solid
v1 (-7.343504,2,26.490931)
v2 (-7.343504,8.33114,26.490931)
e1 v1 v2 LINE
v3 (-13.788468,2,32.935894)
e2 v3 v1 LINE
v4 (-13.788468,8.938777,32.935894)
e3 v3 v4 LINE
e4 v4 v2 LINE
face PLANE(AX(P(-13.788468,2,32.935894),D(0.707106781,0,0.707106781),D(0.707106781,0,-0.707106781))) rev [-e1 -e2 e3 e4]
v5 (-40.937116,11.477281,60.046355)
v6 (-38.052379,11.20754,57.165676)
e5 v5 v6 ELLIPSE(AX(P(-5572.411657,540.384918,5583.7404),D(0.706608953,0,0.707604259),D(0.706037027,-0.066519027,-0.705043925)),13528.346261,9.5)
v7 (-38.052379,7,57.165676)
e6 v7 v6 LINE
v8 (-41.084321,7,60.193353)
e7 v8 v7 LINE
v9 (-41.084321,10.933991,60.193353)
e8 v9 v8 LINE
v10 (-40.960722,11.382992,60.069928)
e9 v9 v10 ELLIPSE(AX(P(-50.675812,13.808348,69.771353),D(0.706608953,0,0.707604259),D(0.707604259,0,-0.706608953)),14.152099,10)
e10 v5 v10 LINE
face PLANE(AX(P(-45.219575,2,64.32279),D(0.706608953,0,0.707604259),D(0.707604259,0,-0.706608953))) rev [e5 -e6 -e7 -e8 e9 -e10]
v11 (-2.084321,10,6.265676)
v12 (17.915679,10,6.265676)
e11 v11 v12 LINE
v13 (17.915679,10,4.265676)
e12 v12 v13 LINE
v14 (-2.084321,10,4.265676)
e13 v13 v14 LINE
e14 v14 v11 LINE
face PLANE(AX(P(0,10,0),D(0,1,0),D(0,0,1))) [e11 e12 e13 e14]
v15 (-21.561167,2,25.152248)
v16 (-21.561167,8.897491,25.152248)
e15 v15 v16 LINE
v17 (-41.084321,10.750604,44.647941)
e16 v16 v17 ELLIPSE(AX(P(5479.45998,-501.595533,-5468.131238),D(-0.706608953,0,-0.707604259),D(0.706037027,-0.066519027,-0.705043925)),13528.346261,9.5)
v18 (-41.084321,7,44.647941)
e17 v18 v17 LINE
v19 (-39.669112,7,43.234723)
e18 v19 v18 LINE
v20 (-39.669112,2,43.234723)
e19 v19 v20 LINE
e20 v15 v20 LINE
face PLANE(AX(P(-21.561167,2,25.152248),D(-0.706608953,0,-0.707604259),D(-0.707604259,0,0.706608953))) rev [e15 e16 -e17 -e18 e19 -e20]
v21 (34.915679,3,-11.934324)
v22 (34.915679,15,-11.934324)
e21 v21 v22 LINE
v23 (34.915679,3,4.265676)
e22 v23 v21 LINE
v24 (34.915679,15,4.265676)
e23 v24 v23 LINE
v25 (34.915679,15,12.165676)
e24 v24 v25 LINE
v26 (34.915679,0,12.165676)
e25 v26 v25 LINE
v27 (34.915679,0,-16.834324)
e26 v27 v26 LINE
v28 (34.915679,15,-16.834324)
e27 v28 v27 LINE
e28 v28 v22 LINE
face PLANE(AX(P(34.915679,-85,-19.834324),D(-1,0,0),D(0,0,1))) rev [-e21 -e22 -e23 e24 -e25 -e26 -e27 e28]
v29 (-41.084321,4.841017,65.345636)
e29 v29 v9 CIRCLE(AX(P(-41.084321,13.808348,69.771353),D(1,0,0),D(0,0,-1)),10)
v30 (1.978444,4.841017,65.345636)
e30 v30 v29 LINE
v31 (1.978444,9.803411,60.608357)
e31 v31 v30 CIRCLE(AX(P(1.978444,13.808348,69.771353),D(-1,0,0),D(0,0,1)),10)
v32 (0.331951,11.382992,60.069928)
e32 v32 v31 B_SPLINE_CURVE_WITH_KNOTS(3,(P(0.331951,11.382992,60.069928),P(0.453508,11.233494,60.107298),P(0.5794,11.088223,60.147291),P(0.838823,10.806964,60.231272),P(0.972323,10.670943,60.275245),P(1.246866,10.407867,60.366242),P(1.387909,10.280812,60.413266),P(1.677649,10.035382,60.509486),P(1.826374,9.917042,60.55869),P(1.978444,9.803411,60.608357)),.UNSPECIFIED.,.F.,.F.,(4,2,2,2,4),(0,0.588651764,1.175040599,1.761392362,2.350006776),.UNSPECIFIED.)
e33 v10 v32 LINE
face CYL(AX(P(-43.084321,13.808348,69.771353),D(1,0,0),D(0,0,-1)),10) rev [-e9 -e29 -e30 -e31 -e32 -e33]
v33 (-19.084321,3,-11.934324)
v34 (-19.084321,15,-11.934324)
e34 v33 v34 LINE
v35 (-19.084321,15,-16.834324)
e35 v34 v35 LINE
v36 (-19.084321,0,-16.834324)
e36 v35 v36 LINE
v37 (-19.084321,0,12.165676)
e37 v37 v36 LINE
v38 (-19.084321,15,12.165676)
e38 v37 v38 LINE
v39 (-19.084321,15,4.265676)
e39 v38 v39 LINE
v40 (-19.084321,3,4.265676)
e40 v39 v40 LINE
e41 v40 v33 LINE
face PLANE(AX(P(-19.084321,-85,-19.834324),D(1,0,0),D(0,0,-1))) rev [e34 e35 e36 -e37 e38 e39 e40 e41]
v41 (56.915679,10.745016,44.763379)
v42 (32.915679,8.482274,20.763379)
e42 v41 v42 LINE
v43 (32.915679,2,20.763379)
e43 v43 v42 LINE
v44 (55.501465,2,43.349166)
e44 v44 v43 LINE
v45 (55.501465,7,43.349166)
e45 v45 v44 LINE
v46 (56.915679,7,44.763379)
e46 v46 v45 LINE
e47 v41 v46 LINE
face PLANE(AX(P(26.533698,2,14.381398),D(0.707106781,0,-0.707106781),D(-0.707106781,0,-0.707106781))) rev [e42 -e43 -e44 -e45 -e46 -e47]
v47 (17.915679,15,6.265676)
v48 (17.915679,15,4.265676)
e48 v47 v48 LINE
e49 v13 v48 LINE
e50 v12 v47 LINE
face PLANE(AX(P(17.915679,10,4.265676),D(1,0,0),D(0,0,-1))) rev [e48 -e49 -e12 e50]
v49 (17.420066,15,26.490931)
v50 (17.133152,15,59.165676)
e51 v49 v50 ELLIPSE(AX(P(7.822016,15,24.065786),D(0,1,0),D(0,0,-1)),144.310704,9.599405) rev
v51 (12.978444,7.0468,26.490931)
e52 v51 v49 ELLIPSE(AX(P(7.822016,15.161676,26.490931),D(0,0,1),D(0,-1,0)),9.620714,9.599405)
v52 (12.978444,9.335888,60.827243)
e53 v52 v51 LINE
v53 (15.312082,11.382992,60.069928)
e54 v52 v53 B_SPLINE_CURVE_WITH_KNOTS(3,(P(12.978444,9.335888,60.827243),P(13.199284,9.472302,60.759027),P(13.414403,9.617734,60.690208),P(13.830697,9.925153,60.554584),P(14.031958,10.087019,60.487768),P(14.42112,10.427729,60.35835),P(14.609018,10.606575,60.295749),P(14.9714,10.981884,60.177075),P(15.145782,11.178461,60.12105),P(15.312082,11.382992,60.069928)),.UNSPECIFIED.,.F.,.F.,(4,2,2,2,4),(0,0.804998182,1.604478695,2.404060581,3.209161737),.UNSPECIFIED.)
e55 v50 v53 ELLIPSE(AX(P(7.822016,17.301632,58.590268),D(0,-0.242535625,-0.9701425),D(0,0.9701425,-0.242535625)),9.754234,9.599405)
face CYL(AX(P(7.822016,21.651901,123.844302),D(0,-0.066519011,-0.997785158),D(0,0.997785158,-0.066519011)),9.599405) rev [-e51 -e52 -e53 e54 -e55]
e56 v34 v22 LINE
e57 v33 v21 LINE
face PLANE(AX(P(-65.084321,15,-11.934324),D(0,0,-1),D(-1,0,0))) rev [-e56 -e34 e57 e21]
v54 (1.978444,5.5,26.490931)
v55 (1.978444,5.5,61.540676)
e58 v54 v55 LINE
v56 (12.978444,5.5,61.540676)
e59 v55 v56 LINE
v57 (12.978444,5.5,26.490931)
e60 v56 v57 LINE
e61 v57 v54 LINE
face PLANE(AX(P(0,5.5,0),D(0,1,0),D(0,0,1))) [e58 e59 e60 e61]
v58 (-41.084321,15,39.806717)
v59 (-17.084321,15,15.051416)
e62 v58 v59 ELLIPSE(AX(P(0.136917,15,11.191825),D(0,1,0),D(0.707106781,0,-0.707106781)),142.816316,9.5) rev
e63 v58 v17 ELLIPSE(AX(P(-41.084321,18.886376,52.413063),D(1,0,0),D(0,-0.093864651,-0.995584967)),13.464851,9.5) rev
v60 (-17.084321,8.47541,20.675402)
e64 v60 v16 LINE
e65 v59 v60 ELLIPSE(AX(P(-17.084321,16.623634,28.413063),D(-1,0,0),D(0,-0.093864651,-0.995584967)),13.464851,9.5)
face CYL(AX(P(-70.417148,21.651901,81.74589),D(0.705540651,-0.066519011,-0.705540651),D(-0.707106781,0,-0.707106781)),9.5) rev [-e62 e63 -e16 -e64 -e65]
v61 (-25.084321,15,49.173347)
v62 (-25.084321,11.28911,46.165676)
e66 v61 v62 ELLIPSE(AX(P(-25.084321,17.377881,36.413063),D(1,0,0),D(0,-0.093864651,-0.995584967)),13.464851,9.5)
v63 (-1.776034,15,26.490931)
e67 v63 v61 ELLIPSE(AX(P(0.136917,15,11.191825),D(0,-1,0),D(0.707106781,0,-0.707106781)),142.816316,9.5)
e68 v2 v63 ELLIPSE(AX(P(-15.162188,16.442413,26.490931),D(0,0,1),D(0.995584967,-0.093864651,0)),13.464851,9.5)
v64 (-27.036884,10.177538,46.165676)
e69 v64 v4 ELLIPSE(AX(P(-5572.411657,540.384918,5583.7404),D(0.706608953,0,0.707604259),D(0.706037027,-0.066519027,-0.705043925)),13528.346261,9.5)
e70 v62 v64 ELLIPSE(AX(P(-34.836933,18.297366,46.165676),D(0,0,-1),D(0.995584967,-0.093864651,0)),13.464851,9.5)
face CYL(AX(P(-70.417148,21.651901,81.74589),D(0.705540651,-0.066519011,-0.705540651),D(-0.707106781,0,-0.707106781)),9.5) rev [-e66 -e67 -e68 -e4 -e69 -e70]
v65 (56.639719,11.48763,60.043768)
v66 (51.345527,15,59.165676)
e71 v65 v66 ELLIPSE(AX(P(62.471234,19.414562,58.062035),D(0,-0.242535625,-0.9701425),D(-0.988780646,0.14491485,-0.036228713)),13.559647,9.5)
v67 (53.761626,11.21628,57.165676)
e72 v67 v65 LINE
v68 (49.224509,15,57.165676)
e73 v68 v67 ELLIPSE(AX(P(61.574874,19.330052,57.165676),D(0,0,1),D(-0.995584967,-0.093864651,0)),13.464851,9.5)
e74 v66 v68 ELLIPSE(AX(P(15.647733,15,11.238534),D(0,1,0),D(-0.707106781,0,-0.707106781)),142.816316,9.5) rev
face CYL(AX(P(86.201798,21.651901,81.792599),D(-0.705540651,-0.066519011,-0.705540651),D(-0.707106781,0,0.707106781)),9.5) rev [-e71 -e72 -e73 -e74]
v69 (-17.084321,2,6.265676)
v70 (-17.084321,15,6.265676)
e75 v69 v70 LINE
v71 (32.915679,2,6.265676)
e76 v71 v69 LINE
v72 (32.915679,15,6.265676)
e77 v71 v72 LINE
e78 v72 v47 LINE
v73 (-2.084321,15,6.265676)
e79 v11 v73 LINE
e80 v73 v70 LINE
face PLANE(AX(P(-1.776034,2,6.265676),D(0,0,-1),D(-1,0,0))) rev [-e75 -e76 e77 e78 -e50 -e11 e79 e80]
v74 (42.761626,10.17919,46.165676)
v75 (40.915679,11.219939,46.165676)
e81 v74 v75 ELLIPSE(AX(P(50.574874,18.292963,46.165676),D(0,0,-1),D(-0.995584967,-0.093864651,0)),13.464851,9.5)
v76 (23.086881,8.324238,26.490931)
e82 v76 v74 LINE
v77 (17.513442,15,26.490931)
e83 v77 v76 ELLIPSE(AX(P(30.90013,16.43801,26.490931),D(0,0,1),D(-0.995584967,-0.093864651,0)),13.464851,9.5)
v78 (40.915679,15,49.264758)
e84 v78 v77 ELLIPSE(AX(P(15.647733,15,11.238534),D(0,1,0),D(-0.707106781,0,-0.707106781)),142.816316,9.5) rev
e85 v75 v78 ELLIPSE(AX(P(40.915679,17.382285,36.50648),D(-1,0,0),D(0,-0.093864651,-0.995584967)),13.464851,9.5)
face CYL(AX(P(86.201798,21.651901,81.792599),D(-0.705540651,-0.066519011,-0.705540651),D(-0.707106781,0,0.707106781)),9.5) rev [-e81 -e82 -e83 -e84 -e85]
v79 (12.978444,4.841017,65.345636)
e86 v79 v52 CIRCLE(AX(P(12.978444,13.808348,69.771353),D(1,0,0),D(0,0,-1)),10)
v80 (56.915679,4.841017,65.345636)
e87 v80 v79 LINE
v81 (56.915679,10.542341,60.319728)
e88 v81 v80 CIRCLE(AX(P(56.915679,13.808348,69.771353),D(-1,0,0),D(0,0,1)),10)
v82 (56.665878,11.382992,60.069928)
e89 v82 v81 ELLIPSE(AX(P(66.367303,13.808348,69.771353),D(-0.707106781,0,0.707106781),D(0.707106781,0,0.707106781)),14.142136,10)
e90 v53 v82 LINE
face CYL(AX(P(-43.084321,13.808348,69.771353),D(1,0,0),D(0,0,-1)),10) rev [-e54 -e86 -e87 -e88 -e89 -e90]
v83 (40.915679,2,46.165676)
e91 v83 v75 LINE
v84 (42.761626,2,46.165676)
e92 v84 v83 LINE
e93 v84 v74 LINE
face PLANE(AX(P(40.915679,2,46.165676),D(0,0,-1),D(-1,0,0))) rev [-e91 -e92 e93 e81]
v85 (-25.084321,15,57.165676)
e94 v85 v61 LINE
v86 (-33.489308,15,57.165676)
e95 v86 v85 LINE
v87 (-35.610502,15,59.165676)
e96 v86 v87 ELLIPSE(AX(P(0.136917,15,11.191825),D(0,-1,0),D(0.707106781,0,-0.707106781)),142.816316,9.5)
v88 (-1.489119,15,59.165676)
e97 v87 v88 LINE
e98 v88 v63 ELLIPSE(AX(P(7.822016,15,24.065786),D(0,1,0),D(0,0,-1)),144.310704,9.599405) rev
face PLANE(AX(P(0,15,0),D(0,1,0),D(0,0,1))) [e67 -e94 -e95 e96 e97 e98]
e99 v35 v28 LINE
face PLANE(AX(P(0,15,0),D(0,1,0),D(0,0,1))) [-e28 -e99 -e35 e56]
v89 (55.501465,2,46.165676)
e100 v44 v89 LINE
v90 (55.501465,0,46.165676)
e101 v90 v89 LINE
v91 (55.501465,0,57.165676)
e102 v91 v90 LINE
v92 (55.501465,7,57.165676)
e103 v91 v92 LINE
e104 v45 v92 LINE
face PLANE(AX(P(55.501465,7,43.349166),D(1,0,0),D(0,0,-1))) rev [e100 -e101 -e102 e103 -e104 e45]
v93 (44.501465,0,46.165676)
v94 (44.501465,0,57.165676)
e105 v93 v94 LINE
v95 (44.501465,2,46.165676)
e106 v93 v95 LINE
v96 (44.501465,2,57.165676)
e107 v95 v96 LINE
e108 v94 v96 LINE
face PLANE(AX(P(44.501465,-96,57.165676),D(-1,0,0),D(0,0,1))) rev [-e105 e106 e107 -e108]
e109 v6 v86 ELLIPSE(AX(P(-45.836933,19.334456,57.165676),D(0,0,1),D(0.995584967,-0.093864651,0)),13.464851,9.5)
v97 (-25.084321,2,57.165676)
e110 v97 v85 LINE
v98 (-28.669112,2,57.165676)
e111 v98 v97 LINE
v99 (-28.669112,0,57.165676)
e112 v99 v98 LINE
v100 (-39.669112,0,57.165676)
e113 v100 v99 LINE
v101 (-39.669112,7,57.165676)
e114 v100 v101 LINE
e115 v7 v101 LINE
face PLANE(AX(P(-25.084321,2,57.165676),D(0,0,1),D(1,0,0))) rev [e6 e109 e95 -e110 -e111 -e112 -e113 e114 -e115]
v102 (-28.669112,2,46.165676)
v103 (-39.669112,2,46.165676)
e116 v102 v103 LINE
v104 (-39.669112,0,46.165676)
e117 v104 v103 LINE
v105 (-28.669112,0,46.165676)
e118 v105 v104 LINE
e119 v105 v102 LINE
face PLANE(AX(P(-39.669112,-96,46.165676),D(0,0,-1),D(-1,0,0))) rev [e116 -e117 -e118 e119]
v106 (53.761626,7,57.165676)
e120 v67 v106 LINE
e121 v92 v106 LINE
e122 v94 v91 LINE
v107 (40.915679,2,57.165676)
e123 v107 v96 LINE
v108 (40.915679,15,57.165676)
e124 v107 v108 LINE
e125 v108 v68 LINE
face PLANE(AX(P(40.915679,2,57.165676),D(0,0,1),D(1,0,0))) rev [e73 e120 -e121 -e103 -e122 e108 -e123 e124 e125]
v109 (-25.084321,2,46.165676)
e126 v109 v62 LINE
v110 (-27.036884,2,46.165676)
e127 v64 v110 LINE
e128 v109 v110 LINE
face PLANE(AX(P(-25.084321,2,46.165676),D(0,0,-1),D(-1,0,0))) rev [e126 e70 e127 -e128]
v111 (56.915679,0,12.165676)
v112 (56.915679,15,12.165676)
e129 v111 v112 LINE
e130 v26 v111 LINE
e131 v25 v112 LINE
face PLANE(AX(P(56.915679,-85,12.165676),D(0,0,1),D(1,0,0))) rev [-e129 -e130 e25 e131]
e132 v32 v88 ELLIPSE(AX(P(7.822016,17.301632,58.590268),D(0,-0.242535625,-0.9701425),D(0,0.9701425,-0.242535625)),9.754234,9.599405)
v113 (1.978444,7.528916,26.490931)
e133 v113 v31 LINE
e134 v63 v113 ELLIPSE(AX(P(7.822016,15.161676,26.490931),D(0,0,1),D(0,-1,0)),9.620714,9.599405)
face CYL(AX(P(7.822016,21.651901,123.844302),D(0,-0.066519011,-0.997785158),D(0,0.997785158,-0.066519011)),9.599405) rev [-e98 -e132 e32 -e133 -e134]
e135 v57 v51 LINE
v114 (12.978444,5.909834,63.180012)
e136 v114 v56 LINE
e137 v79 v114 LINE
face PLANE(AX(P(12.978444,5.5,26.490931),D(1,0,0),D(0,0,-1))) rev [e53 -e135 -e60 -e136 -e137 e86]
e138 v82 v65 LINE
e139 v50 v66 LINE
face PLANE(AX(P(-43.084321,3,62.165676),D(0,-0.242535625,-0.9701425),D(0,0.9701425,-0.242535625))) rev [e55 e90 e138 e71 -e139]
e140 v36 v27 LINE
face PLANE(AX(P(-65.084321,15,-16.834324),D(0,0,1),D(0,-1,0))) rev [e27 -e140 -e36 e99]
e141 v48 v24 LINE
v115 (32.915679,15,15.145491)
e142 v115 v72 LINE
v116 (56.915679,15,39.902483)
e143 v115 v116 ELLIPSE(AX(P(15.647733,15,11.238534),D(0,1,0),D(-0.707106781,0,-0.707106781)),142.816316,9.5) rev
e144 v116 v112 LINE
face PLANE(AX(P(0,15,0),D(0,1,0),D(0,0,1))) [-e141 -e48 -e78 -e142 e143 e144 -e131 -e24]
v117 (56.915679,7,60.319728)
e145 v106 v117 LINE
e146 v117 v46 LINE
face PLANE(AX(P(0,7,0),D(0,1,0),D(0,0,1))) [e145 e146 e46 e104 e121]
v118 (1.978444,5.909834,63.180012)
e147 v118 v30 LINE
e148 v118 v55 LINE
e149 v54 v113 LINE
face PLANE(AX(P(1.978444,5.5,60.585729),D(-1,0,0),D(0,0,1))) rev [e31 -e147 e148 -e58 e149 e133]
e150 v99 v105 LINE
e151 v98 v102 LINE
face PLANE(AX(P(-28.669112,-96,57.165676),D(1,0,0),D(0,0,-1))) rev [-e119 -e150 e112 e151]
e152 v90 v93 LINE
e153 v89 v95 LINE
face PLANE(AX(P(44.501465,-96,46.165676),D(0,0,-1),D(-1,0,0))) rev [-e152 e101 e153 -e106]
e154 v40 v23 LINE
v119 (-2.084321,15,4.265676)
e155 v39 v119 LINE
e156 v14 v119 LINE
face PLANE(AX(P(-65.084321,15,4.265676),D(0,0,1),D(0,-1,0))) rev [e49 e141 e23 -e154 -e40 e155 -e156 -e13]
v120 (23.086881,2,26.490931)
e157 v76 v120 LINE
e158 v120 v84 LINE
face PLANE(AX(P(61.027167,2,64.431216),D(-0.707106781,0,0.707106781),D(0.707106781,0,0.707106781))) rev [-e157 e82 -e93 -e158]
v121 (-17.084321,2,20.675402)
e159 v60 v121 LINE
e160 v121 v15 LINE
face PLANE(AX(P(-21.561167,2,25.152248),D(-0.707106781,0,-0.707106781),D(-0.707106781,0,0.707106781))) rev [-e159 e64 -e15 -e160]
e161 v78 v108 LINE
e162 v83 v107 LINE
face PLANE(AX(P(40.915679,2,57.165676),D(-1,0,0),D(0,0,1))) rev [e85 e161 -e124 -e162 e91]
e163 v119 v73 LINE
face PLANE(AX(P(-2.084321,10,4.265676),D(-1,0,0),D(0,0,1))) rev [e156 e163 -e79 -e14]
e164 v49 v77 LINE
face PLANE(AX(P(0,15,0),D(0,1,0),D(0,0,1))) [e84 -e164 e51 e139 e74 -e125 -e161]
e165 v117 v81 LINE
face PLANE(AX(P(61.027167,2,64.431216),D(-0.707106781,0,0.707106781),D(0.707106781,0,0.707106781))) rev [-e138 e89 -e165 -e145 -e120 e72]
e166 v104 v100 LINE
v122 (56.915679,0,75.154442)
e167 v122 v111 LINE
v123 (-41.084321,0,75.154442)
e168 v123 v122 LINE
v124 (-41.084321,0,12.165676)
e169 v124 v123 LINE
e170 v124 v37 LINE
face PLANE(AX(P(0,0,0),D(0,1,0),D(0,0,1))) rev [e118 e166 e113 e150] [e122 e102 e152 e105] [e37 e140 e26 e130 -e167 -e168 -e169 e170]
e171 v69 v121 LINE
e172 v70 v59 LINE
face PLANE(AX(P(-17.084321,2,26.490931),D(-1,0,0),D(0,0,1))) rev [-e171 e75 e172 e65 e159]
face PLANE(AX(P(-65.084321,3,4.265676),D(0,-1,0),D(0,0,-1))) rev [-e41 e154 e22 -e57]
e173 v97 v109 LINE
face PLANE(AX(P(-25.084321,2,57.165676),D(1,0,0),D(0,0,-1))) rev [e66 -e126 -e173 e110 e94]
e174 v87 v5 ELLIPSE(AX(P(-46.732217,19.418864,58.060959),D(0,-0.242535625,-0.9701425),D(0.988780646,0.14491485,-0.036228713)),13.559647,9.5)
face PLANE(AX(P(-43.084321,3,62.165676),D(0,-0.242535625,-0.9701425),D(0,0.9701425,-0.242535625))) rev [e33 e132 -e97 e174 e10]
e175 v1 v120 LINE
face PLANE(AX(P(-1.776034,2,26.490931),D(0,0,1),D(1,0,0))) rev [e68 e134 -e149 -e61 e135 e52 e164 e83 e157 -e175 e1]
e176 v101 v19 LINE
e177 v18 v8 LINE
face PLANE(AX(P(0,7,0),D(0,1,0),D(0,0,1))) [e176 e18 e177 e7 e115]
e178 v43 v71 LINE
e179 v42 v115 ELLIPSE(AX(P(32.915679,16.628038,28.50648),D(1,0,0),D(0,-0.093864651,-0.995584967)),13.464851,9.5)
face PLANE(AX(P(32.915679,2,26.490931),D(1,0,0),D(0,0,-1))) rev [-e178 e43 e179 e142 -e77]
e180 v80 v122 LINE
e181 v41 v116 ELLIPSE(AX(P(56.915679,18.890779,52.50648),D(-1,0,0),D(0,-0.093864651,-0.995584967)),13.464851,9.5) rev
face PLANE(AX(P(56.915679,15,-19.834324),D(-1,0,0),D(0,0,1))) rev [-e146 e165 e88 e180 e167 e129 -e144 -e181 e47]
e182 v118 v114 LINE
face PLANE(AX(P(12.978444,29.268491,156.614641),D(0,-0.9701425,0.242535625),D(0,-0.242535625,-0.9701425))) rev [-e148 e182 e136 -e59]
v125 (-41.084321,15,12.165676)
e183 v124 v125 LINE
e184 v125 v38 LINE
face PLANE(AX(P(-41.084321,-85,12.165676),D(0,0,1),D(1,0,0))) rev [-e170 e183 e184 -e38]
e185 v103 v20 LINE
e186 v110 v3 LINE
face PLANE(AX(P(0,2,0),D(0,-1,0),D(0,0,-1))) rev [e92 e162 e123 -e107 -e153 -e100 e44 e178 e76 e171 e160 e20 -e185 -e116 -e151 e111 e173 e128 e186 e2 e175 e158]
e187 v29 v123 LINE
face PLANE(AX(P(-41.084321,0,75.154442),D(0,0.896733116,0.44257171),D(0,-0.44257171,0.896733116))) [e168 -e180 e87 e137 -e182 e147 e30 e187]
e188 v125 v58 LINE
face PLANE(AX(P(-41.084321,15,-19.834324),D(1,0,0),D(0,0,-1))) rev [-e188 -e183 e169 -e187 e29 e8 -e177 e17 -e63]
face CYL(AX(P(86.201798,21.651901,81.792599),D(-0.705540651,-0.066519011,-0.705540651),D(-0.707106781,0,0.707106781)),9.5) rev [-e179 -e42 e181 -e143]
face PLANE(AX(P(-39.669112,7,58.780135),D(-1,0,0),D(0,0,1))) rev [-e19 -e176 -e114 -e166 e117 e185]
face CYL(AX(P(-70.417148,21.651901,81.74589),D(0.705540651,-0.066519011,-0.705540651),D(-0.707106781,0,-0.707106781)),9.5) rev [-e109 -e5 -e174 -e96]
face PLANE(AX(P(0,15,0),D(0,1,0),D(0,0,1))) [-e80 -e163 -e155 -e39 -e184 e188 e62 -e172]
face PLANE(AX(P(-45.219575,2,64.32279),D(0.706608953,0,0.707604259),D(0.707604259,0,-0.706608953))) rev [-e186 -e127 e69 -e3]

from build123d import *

# Parameters (mm, degrees)
SKETCH1_W                = 98
SKETCH1_H                = 90
BOSS_EXTRUDE1_DEPTH      = 15
CUT_EXTRUDE1_DEPTH       = 15
CUT_EXTRUDE2_DEPTH       = 15
CUT_EXTRUDE5_DEPTH       = 100
CUT_EXTRUDE6_DEPTH       = 100
SKETCH9_R                = 9.5
CUT_EXTRUDE7_DEPTH       = 45
SKETCH10_R               = 9.5
CUT_EXTRUDE8_DEPTH       = 45
BOSS_EXTRUDE3_DEPTH      = 100
BOSS_EXTRUDE4_DEPTH      = 100
SKETCH14_W               = 54.537944566
SKETCH14_H               = 37.433727788
CUT_EXTRUDE9_DEPTH       = 100
SKETCH15_W               = 37.221464136
SKETCH15_H               = 31.979004399
CUT_EXTRUDE10_DEPTH      = 100
BOSS_EXTRUDE5_DEPTH      = 15
BOSS_EXTRUDE6_DEPTH      = 15
BOSS_EXTRUDE7_DEPTH      = 15
CUT_EXTRUDE11_DEPTH      = 100
SKETCH20_R               = 9.5
CUT_EXTRUDE12_DEPTH      = 45
SKETCH21_R               = 9.5
CUT_EXTRUDE13_DEPTH      = 100
SKETCH22_R               = 9.5
BOSS_EXTRUDE8_DEPTH      = 55
SKETCH23_R               = 9.5
CUT_EXTRUDE14_DEPTH      = 55
SKETCH24_R               = 9.5
CUT_EXTRUDE15_DEPTH      = 100
SKETCH25_R               = 9.5
BOSS_EXTRUDE10_DEPTH     = 100
SKETCH26_R               = 9.5
CUT_EXTRUDE16_DEPTH      = 100
CUT_EXTRUDE19_DEPTH      = 100
CUT_EXTRUDE19_DEPTH_BACK = 100
SKETCH27_W               = 176.377882562
SKETCH27_H               = 122.842530298
SKETCH27_W_2             = 98
SKETCH27_H_2             = 90
SKETCH28_W               = 109.510814303
SKETCH28_H               = 24.111992001
CUT_EXTRUDE20_DEPTH      = 100
SKETCH29_R               = 9.59940523
CUT_EXTRUDE21_DEPTH      = 100
SKETCH30_W               = 22
SKETCH30_H               = 32
CUT_EXTRUDE22_DEPTH      = 100
SKETCH31_W               = 16.2
SKETCH31_H               = 12
CUT_EXTRUDE23_DEPTH      = 100
CUT_EXTRUDE24_DEPTH      = 13
SKETCH33_W               = 50.373016546
SKETCH33_H               = 2
BOSS_EXTRUDE12_DEPTH     = 15
SKETCH34_W               = 20
SKETCH34_H               = 2
CUT_EXTRUDE25_DEPTH      = 5
CUT_EXTRUDE27_DEPTH      = 100
SKETCH37_W               = 14
SKETCH37_H               = 11
CUT_EXTRUDE28_DEPTH      = 13
CUT_EXTRUDE32_DEPTH      = 9.5
CUT_EXTRUDE33_DEPTH      = 13
CUT_EXTRUDE34_DEPTH      = 13
BOSS_EXTRUDE18_DEPTH     = 5
BOSS_EXTRUDE19_DEPTH     = 5
BOSS_EXTRUDE21_DEPTH     = 98
BOSS_EXTRUDE22_DEPTH     = 98
BOSS_EXTRUDE23_DEPTH     = 98
SKETCH47_W               = 11
SKETCH47_H               = 1.433264646
CUT_EXTRUDE36_DEPTH      = 98
SKETCH48_W               = 11
SKETCH48_H               = 11
CUT_EXTRUDE37_DEPTH      = 98
BOSS_EXTRUDE24_DEPTH     = 5
BOSS_EXTRUDE25_DEPTH     = 5
FILLET1_R                = 10
SKETCH52_W               = 3
SKETCH52_H               = 15
CUT_EXTRUDE39_DEPTH      = 100


with BuildPart() as part:
    # Sketch1 → Boss-Extrude1 (new body)
    with BuildSketch(Plane(origin=(0, 0, 0), x_dir=(1, 0, 0), z_dir=(0, 1, 0))):
        with Locations((7.915679061, -25.165675541)):
            Rectangle(SKETCH1_W, SKETCH1_H)
    extrude(amount=BOSS_EXTRUDE1_DEPTH)

    # Sketch3 → Cut-Extrude1 (cut)
    with BuildSketch(Plane(origin=(0, 15, 0), x_dir=(1, 0, 0), z_dir=(0, 1, 0))):
        Polygon((-41.084320939, -35.165675541), (-6.084320939, -70.165675541), (-41.084320939, -70.165675541), align=None)
        Polygon((21.915679061, -70.165675541), (56.915679061, -35.165675541), (56.915679061, -70.165675541), align=None)
    extrude(amount=-CUT_EXTRUDE1_DEPTH, mode=Mode.SUBTRACT)

    # Sketch4 → Cut-Extrude2 (cut)
    with BuildSketch(Plane(origin=(0, 15, 0), x_dir=(1, 0, 0), z_dir=(0, 1, 0))):
        Polygon((-41.084320939, -35.165675541), (-32.241899351, -26.323253953), (-41.084320939, -17.480832365), align=None)
        Polygon((56.915679061, -17.480832365), (48.073257473, -26.323253953), (56.915679061, -35.165675541), align=None)
    extrude(amount=-CUT_EXTRUDE2_DEPTH, mode=Mode.SUBTRACT)

    # Sketch5 → Cut-Extrude5 (cut)
    with BuildSketch(Plane(origin=(-2.959322699, 0, -2.959322699), x_dir=(-0.7071067811865461, 0, 0.7071067811865489), z_dir=(-0.7071067811865489, 0, -0.7071067811865461))):
        Polygon((53.916889577, 0), (52.916889577, 15), (53.916889577, 15), align=None)
    extrude(amount=-CUT_EXTRUDE5_DEPTH, mode=Mode.SUBTRACT)

    # Sketch8 → Cut-Extrude6 (cut)
    with BuildSketch(Plane(origin=(10.87500176, 0, -10.87500176), x_dir=(-0.7071067811865438, 0, -0.7071067811865513), z_dir=(0.7071067811865513, 0, -0.7071067811865438))):
        Polygon((-65.11135026, 0), (-64.11135026, 15), (-65.11135026, 15), align=None)
    extrude(amount=-CUT_EXTRUDE6_DEPTH, mode=Mode.SUBTRACT)

    # Sketch9 → Cut-Extrude7 (cut)
    with BuildSketch(Plane(origin=(45.83695749, 4.321549796, 45.83695749), x_dir=(0.7086694500121591, -0.06622532692378834, -0.7024256663116043), z_dir=(0.7055406512876944, 0.06651901052377404, 0.7055406512877016))):
        with Locations((-0.364665022, 13.674807707)):
            Circle(SKETCH9_R)
    extrude(amount=-CUT_EXTRUDE7_DEPTH, mode=Mode.SUBTRACT)

    # Sketch10 → Cut-Extrude8 (cut)
    with BuildSketch(Plane(origin=(-37.956303558, 3.578554618, 37.956303558), x_dir=(0.708669450012157, 0.06622532692378813, 0.7024256663116066), z_dir=(-0.7055406512876966, 0.06651901052377338, 0.7055406512876994))):
        with Locations((11.452044949, 13.683576238)):
            Circle(SKETCH10_R)
    extrude(amount=-CUT_EXTRUDE8_DEPTH, mode=Mode.SUBTRACT)

    # Sketch12 → Boss-Extrude3 (add)
    with BuildSketch(Plane(origin=(10.87500176, 0, -10.87500176), x_dir=(-0.7071067811865438, 0, -0.7071067811865513), z_dir=(0.7071067811865513, 0, -0.7071067811865438))):
        Polygon((-65.11135026, 0), (-64.11135026, 15), (-65.11135026, 15), align=None)
    extrude(amount=-BOSS_EXTRUDE3_DEPTH)

    # Sketch13 → Boss-Extrude4 (add)
    with BuildSketch(Plane(origin=(-2.959322699, 0, -2.959322699), x_dir=(-0.7071067811865461, 0, 0.7071067811865489), z_dir=(-0.7071067811865489, 0, -0.7071067811865461))):
        Polygon((53.916889577, 0), (52.916889577, 15), (53.916889577, 15), align=None)
    extrude(amount=-BOSS_EXTRUDE4_DEPTH)

    # Sketch14 → Cut-Extrude9 (cut)
    with BuildSketch(Plane(origin=(0, 15, 0), x_dir=(1, 0, 0), z_dir=(0, 1, 0))):
        with Locations((21.184651344, -88.882539435)):
            Rectangle(SKETCH14_W, SKETCH14_H)
    extrude(amount=-CUT_EXTRUDE9_DEPTH, mode=Mode.SUBTRACT)


with BuildPart() as cut_extrude9_piece_1:
    # of the separate pieces the step leaves, piece 1, a body of its own (cut_extrude9_pieces)
    add(part.part.solids().sort_by_distance((-41.084320939, 0, -19.834324459))[0])

    # Sketch16 → Boss-Extrude5 (add)
    with BuildSketch(Plane(origin=(0, 15, 0), x_dir=(1, 0, 0), z_dir=(0, 1, 0))):
        Polygon((-6.084320939, -70.165675541), (-35.8985557, -70.165675541), (-41.084320939, -70.165675541), (-41.084320939, -35.165675541), align=None)
    extrude(amount=-BOSS_EXTRUDE5_DEPTH)

    # Sketch17 → Boss-Extrude6 (add)
    with BuildSketch(Plane(origin=(0, 15, 0), x_dir=(1, 0, 0), z_dir=(0, 1, 0))):
        Polygon((21.915679061, -70.165675541), (49.886241171, -70.165675541), (56.915679061, -70.165675541), (56.915679061, -35.165675541), align=None)
    extrude(amount=-BOSS_EXTRUDE6_DEPTH)

    # Sketch18 → Boss-Extrude7 (add)
    with BuildSketch(Plane(origin=(0, 15, 0), x_dir=(1, 0, 0), z_dir=(0, 1, 0))):
        Polygon((48.073257473, -26.323253953), (56.915679061, -17.480832365), (56.915679061, -35.165675541), align=None)
        Polygon((-41.084320939, -35.165675541), (-41.084320939, -17.480832365), (-32.241899351, -26.323253953), align=None)
    extrude(amount=-BOSS_EXTRUDE7_DEPTH)

    # Sketch19 → Cut-Extrude11 (cut)
    with BuildSketch(Plane(origin=(56.915679061, 0, 0), x_dir=(0, 0, -1), z_dir=(1, 0, 0))):
        Polygon((-70.165675541, 0), (-69.165675541, 15), (-70.165675541, 15), align=None)
    extrude(amount=-CUT_EXTRUDE11_DEPTH, mode=Mode.SUBTRACT)

    # Sketch20 → Cut-Extrude12 (cut)
    with BuildSketch(Plane(origin=(0, 4.657013863, 69.85520795), x_dir=(1, 0, 0), z_dir=(0, 0.06651901052377399, 0.997785157856609))):
        with Locations((7.915679061, 13.33264869)):
            Circle(SKETCH20_R)
    extrude(amount=-CUT_EXTRUDE12_DEPTH, mode=Mode.SUBTRACT)

    # Sketch21 → Cut-Extrude13 (cut)
    with BuildSketch(Plane(origin=(14.087628182, 1.328194322, 14.087628182), x_dir=(0.708669450012159, -0.06622532692378837, -0.7024256663116044), z_dir=(0.7055406512876945, 0.06651901052377404, 0.7055406512877015))):
        with Locations((2.201455665, 13.878873478)):
            Circle(SKETCH21_R)
    extrude(amount=CUT_EXTRUDE13_DEPTH, mode=Mode.SUBTRACT)

    # Sketch22 → Boss-Extrude8 (add)
    with BuildSketch(Plane(origin=(14.087628182, 1.328194322, 14.087628182), x_dir=(0.708669450012159, -0.06622532692378837, -0.7024256663116044), z_dir=(0.7055406512876945, 0.06651901052377404, 0.7055406512877015))):
        with Locations((-0.364665022, 13.674807707)):
            Circle(SKETCH22_R)
    extrude(amount=BOSS_EXTRUDE8_DEPTH)

    # Sketch23 → Cut-Extrude14 (cut)
    with BuildSketch(Plane(origin=(52.892364003, 4.986739901, 52.892364003), x_dir=(0.7024256663116113, 0.0662253269237897, -0.7086694500121521), z_dir=(0.7055406512876945, 0.06651901052377404, 0.7055406512877014))):
        with Locations((4.020343442, 13.465005557)):
            Circle(SKETCH23_R)
    extrude(amount=-CUT_EXTRUDE14_DEPTH, mode=Mode.SUBTRACT)

    # Sketch24 → Cut-Extrude15 (cut)
    with BuildSketch(Plane(origin=(-6.20697425, 0.585199144, 6.20697425), x_dir=(0.708669450012157, 0.06622532692378813, 0.7024256663116066), z_dir=(-0.7055406512876966, 0.06651901052377338, 0.7055406512876995))):
        with Locations((8.951834225, 13.883257743)):
            Circle(SKETCH24_R)
    extrude(amount=CUT_EXTRUDE15_DEPTH, mode=Mode.SUBTRACT)

    # Sketch25 → Boss-Extrude10 (add)
    with BuildSketch(Plane(origin=(-6.20697425, 0.585199144, 6.20697425), x_dir=(0.708669450012157, 0.06622532692378813, 0.7024256663116066), z_dir=(-0.7055406512876966, 0.06651901052377338, 0.7055406512876994))):
        with Locations(Location((11.452044949, 13.683576238, 0), (0, 0, 175.993532534))):
            Circle(SKETCH25_R)
    extrude(amount=BOSS_EXTRUDE10_DEPTH)

    # Sketch26 → Cut-Extrude16 (cut)
    with BuildSketch(Plane(origin=(-6.20697425, 0.585199144, 6.20697425), x_dir=(0.708669450012157, 0.06622532692378813, 0.7024256663116066), z_dir=(-0.7055406512876966, 0.06651901052377338, 0.7055406512876994))):
        with Locations((8.951834225, 13.883257743)):
            Circle(SKETCH26_R)
    extrude(amount=CUT_EXTRUDE16_DEPTH, mode=Mode.SUBTRACT)

    # Sketch27 → Cut-Extrude19 (cut, two sides: drawn at the far end of the back side and taken through both)
    with BuildSketch(Plane(origin=(0, 15, 0), x_dir=(1, 0, 0), z_dir=(0, 1, 0)).offset(-CUT_EXTRUDE19_DEPTH_BACK)):
        with Locations((3.867081439, -38.319377922)):
            Rectangle(SKETCH27_W, SKETCH27_H)
        with Locations((7.915679061, -25.165675541)):
            Rectangle(SKETCH27_W_2, SKETCH27_H_2, mode=Mode.SUBTRACT)
    extrude(amount=CUT_EXTRUDE19_DEPTH + CUT_EXTRUDE19_DEPTH_BACK, mode=Mode.SUBTRACT)

    # Sketch28 → Cut-Extrude20 (cut)
    with BuildSketch(Plane(origin=(0, 0, -19.834324459), x_dir=(-1, 0, 0), z_dir=(0, 0, -1))):
        with Locations((-2.16027191, 27.055996001)):
            Rectangle(SKETCH28_W, SKETCH28_H)
    extrude(amount=-CUT_EXTRUDE20_DEPTH, mode=Mode.SUBTRACT)

    # Sketch29 → Cut-Extrude21 (cut)
    with BuildSketch(Plane(origin=(0, 1.66365839, 24.954875847), x_dir=(1, 0, 0), z_dir=(0, 0.066519010523774, 0.997785157856609))):
        with Locations((7.822016096, 13.365945069)):
            Circle(SKETCH29_R)
    extrude(amount=CUT_EXTRUDE21_DEPTH, mode=Mode.SUBTRACT)

    # Sketch30 → Cut-Extrude22 (cut)
    with BuildSketch(Plane(origin=(0, 15, 0), x_dir=(1, 0, 0), z_dir=(0, 1, 0))):
        with Locations((-30.084320939, 3.834324459)):
            Rectangle(SKETCH30_W, SKETCH30_H)
        with Locations((45.915679061, 3.834324459)):
            Rectangle(SKETCH30_W, SKETCH30_H)
    extrude(amount=-CUT_EXTRUDE22_DEPTH, mode=Mode.SUBTRACT)

    # Sketch31 → Cut-Extrude23 (cut)
    with BuildSketch(Plane(origin=(34.915679061, 0, 0), x_dir=(0, 0, -1), z_dir=(1, 0, 0))):
        with Locations((3.834324459, 9)):
            Rectangle(SKETCH31_W, SKETCH31_H)
    extrude(amount=-CUT_EXTRUDE23_DEPTH, mode=Mode.SUBTRACT)

    # Sketch32 → Cut-Extrude24 (cut)
    with BuildSketch(Plane(origin=(0, 15, 0), x_dir=(1, 0, 0), z_dir=(0, 1, 0))):
        Polygon((-1.776033561, -26.490930679), (32.915679061, -26.490930679), (32.915679061, -6.265675541), (-1.776033561, -6.265675541), (-17.084320939, -6.265675541), (-17.084320939, -26.490930679), align=None)
    extrude(amount=-CUT_EXTRUDE24_DEPTH, mode=Mode.SUBTRACT)

    # Sketch33 → Boss-Extrude12 (add)
    with BuildSketch(Plane(origin=(0, 15, 0), x_dir=(1, 0, 0), z_dir=(0, 1, 0))):
        with Locations((7.729170788, -5.265675541)):
            Rectangle(SKETCH33_W, SKETCH33_H)
    extrude(amount=-BOSS_EXTRUDE12_DEPTH)

    # Sketch34 → Cut-Extrude25 (cut)
    with BuildSketch(Plane(origin=(0, 15, 0), x_dir=(1, 0, 0), z_dir=(0, 1, 0))):
        with Locations((7.915679061, -5.265675541)):
            Rectangle(SKETCH34_W, SKETCH34_H)
    extrude(amount=-CUT_EXTRUDE25_DEPTH, mode=Mode.SUBTRACT)

    # Sketch35 → Cut-Extrude27 (cut)
    with BuildSketch(Plane(origin=(56.915679061, 0, 0), x_dir=(0, 0, -1), z_dir=(1, 0, 0))):
        Polygon((-70.165675541, 0), (-62.165675541, 3), (-59.165675541, 15), (-69.165675541, 15), align=None)
    extrude(amount=-CUT_EXTRUDE27_DEPTH, mode=Mode.SUBTRACT)

    # Sketch37 → Cut-Extrude28 (cut)
    with BuildSketch(Plane(origin=(0, 15, 0), x_dir=(1, 0, 0), z_dir=(0, 1, 0))):
        with Locations((-32.084320939, -51.665675541)):
            Rectangle(SKETCH37_W, SKETCH37_H)
        with Locations((47.915679061, -51.665675541)):
            Rectangle(SKETCH37_W, SKETCH37_H)
    extrude(amount=-CUT_EXTRUDE28_DEPTH, mode=Mode.SUBTRACT)

    # Sketch38 → Cut-Extrude32 (cut)
    with BuildSketch(Plane(origin=(0, 15, 0), x_dir=(1, 0, 0), z_dir=(0, 1, 0))):
        Polygon((1.978443982, -26.490930679), (12.978443982, -26.490930679), (12.978443982, -60.585728785), (12.978443982, -67.440751443), (1.978443982, -67.440751443), (1.978443982, -60.585728785), align=None)
    extrude(amount=-CUT_EXTRUDE32_DEPTH, mode=Mode.SUBTRACT)

    # Sketch39 → Cut-Extrude33 (cut)
    with BuildSketch(Plane(origin=(0, 15, 0), x_dir=(1, 0, 0), z_dir=(0, 1, 0))):
        Polygon((-45.219574639, -64.32279028), (-13.788468286, -32.935894494), (-3.89606958, -23.043495788), (-11.674242247, -15.265323121), (-21.561166767, -25.152247641), (-52.99227312, -56.539143427), align=None)
    extrude(amount=-CUT_EXTRUDE33_DEPTH, mode=Mode.SUBTRACT)

    # Sketch40 → Cut-Extrude34 (cut)
    with BuildSketch(Plane(origin=(0, 15, 0), x_dir=(1, 0, 0), z_dir=(0, 1, 0))):
        Polygon((61.02716679, -64.431216155), (18.755523073, -22.159572438), (26.533697666, -14.381397845), (68.805341383, -56.653041562), align=None)
    extrude(amount=-CUT_EXTRUDE34_DEPTH, mode=Mode.SUBTRACT)

    # Sketch41 → Boss-Extrude18 (add)
    with BuildSketch(Plane(origin=(0, 2, 0), x_dir=(1, 0, 0), z_dir=(0, 1, 0))):
        Polygon((56.915679061, -60.319728426), (56.915679061, -44.76337924), (55.501465498, -43.349165677), (55.501465498, -58.905514864), align=None)
    extrude(amount=BOSS_EXTRUDE18_DEPTH)

    # Sketch42 → Boss-Extrude19 (add)
    with BuildSketch(Plane(origin=(0, 2, 0), x_dir=(1, 0, 0), z_dir=(0, 1, 0))):
        Polygon((-41.084320939, -44.64794081), (-39.669112421, -43.234722905), (-39.669112421, -58.780135266), (-41.084320939, -60.193353172), align=None)
    extrude(amount=BOSS_EXTRUDE19_DEPTH)

    # Sketch43 → Boss-Extrude21 (add)
    with BuildSketch(Plane(origin=(56.915679061, 0, 0), x_dir=(0, 0, -1), z_dir=(1, 0, 0))):
        Polygon((-62.165675541, 3), (-75.154441573, 0), (-62.154441573, 0), align=None)
    extrude(amount=-BOSS_EXTRUDE21_DEPTH)

    # Sketch45 → Boss-Extrude22 (add)
    with BuildSketch(Plane(origin=(56.915679061, 0, 0), x_dir=(0, 0, -1), z_dir=(1, 0, 0))):
        Polygon((-75.154441573, 0), (-61.544684912, 5.483962515), (-62.165675541, 3), align=None)
    extrude(amount=-BOSS_EXTRUDE22_DEPTH)

    # Sketch46 → Boss-Extrude23 (add)
    with BuildSketch(Plane(origin=(56.915679061, 0, 0), x_dir=(0, 0, -1), z_dir=(1, 0, 0))):
        Polygon((-75.154441573, 0), (-61.193057804, 6.890470947), (-61.544684912, 5.483962515), align=None)
    extrude(amount=-BOSS_EXTRUDE23_DEPTH)

    # Sketch47 → Cut-Extrude36 (cut)
    with BuildSketch(Plane(origin=(0, 14.803688363, 59.21475345), x_dir=(-1, 0, 0), z_dir=(0, -0.24253562503633455, -0.9701425001453315))):
        with Locations((-7.478443982, -8.873390134)):
            Rectangle(SKETCH47_W, SKETCH47_H)
    extrude(amount=-CUT_EXTRUDE36_DEPTH, mode=Mode.SUBTRACT)

    # Sketch48 → Cut-Extrude37 (cut)
    with BuildSketch(Plane(origin=(0, 2, 0), x_dir=(1, 0, 0), z_dir=(0, 1, 0))):
        with Locations((50.001465498, -51.665675541)):
            Rectangle(SKETCH48_W, SKETCH48_H)
        with Locations((-34.169112421, -51.665675541)):
            Rectangle(SKETCH48_W, SKETCH48_H)
    extrude(amount=-CUT_EXTRUDE37_DEPTH, mode=Mode.SUBTRACT)

    # Sketch49 → Boss-Extrude24 (add)
    with BuildSketch(Plane(origin=(0, 2, 0), x_dir=(1, 0, 0), z_dir=(0, 1, 0))):
        Polygon((55.501465498, -58.905514864), (53.761626176, -57.165675541), (55.501465498, -57.165675541), align=None)
    extrude(amount=BOSS_EXTRUDE24_DEPTH)

    # Sketch50 → Boss-Extrude25 (add)
    with BuildSketch(Plane(origin=(0, 2, 0), x_dir=(1, 0, 0), z_dir=(0, 1, 0))):
        Polygon((-39.669112421, -58.780135266), (-39.669112421, -57.165675541), (-38.05237862, -57.165675541), align=None)
    extrude(amount=BOSS_EXTRUDE25_DEPTH)

    # Fillet1
    # the kernel refuses this fillet: 10 mm, written as the material it adds along each edge
    with BuildSketch(Plane(origin=(13.55540496, 6.890470947, 61.193057804), x_dir=(0, 0.9701425001453308, -0.24253562503633758), z_dir=(-1, 0, 0))) as fillet1_piece_1_section:
        with BuildLine():
            CenterArc((FILLET1_R * 0.463078439096, -FILLET1_R), FILLET1_R, 90, 49.695674719)
            Line((-FILLET1_R * 0.299541062007, -FILLET1_R * 0.353152648194), (0, 0))
            Line((0, 0), (FILLET1_R * 0.463078439096, 0))
        make_face()
    fillet1_piece_1 = extrude(amount=66.216686876, mode=Mode.PRIVATE)
    fillet1_piece_1 = fillet1_piece_1 - Plane(origin=(7.822016096, 17.466268035, 61.059806924), x_dir=(1, 0, 0), z_dir=(0, -0.066519010523774, -0.997785157856609)) * Cylinder(9.59940523, 151, mode=Mode.PRIVATE)
    fillet1_piece_1 = split(fillet1_piece_1, bisect_by=Plane(origin=(12.978443982, 7.402731352, 61.73070937), z_dir=(1, 0, 0)), keep=Keep.TOP, mode=Mode.PRIVATE)
    add(fillet1_piece_1)
    with BuildSketch(Plane(origin=(1.978443982, 6.890470947, 61.193057804), x_dir=(0, 0.9701425001453315, -0.24253562503633466), z_dir=(-1, 0, 0))) as fillet1_piece_2_section:
        with BuildLine():
            CenterArc((FILLET1_R * 0.463078439096, -FILLET1_R), FILLET1_R, 90, 49.695674719)
            Line((-FILLET1_R * 0.299541062007, -FILLET1_R * 0.353152648194), (0, 0))
            Line((0, 0), (FILLET1_R * 0.463078439096, 0))
        make_face()
    fillet1_piece_2 = extrude(amount=43.062764921, mode=Mode.PRIVATE)
    fillet1_piece_2 = fillet1_piece_2 - Plane(origin=(7.822016096, 17.463039168, 61.011373922), x_dir=(1, 0, 0), z_dir=(0, -0.066519010523774, -0.997785157856609)) * Cylinder(9.59940523, 105, mode=Mode.PRIVATE)
    fillet1_piece_2 = split(fillet1_piece_2, bisect_by=Plane(origin=(-31.047137457, 7.518724185, 50.170287855), z_dir=(0.7066089528007494, 0, 0.7076042593299086)), keep=Keep.TOP, mode=Mode.PRIVATE)
    add(fillet1_piece_2)
    with BuildSketch(Plane(origin=(56.915679061, 6.890470947, 61.193057804), x_dir=(0, 0.9701425001453315, -0.24253562503633466), z_dir=(-1, 0, 0))) as fillet1_piece_3_section:
        with BuildLine():
            CenterArc((FILLET1_R * 0.463078439096, -FILLET1_R), FILLET1_R, 90, 49.695674719)
            Line((-FILLET1_R * 0.299541062007, -FILLET1_R * 0.353152648194), (0, 0))
            Line((0, 0), (FILLET1_R * 0.463078439096, 0))
        make_face()
    fillet1_piece_3 = extrude(amount=43.937235079, mode=Mode.PRIVATE)
    fillet1_piece_3 = fillet1_piece_3 - Plane(origin=(7.822016096, 17.463085429, 61.012067836), x_dir=(1, 0, 0), z_dir=(0, -0.066519010523774, -0.997785157856609)) * Cylinder(9.59940523, 107, mode=Mode.PRIVATE)
    fillet1_piece_3 = split(fillet1_piece_3, bisect_by=Plane(origin=(46.619372597, 7.517054753, 50.023421962), z_dir=(-0.7071067811865472, 0, 0.7071067811865478)), keep=Keep.TOP, mode=Mode.PRIVATE)
    add(fillet1_piece_3)
    with BuildSketch(Plane(origin=(68.492640038, 6.890470947, 61.193057804), x_dir=(0, 0.9701425001453315, -0.2425356250363346), z_dir=(-1, 0, 0))) as fillet1_piece_4_section:
        with BuildLine():
            CenterArc((FILLET1_R * 0.463078439096, -FILLET1_R), FILLET1_R, 90, 49.695674719)
            Line((-FILLET1_R * 0.299541062007, -FILLET1_R * 0.353152648194), (0, 0))
            Line((0, 0), (FILLET1_R * 0.463078439096, 0))
        make_face()
    fillet1_piece_4 = extrude(amount=67.091157033, mode=Mode.PRIVATE)
    fillet1_piece_4 = fillet1_piece_4 - Plane(origin=(7.822016096, 17.464349007, 61.031021503), x_dir=(1, 0, 0), z_dir=(0, -0.066519010523774, -0.997785157856609)) * Cylinder(9.59940523, 153, mode=Mode.PRIVATE)
    fillet1_piece_4 = split(fillet1_piece_4, bisect_by=Plane(origin=(1.978443982, 7.469174188, 61.697366491), z_dir=(-1, 0, 0)), keep=Keep.TOP, mode=Mode.PRIVATE)
    add(fillet1_piece_4)

    # Sketch52 → Cut-Extrude39 (cut)
    with BuildSketch(Plane(origin=(34.915679061, 0, 0), x_dir=(0, 0, -1), z_dir=(1, 0, 0))):
        with Locations((18.334324459, 7.5)):
            Rectangle(SKETCH52_W, SKETCH52_H)
    extrude(amount=-CUT_EXTRUDE39_DEPTH, mode=Mode.SUBTRACT)


with BuildPart() as cut_extrude9_piece_2:
    # of the separate pieces the step leaves, piece 2, a body of its own (cut_extrude9_pieces)
    add(part.part.solids().sort_by_distance((-6.084320939, 15, 96.751461979))[0])

    # Sketch15 → Cut-Extrude10 (cut)
    with BuildSketch(Plane(origin=(0, 15, 0), x_dir=(1, 0, 0), z_dir=(0, 1, 0))):
        with Locations((-15.067513526, -92.658393077)):
            Rectangle(SKETCH15_W, SKETCH15_H)
    extrude(amount=-CUT_EXTRUDE10_DEPTH, mode=Mode.SUBTRACT)


solid = cut_extrude9_piece_1.part
